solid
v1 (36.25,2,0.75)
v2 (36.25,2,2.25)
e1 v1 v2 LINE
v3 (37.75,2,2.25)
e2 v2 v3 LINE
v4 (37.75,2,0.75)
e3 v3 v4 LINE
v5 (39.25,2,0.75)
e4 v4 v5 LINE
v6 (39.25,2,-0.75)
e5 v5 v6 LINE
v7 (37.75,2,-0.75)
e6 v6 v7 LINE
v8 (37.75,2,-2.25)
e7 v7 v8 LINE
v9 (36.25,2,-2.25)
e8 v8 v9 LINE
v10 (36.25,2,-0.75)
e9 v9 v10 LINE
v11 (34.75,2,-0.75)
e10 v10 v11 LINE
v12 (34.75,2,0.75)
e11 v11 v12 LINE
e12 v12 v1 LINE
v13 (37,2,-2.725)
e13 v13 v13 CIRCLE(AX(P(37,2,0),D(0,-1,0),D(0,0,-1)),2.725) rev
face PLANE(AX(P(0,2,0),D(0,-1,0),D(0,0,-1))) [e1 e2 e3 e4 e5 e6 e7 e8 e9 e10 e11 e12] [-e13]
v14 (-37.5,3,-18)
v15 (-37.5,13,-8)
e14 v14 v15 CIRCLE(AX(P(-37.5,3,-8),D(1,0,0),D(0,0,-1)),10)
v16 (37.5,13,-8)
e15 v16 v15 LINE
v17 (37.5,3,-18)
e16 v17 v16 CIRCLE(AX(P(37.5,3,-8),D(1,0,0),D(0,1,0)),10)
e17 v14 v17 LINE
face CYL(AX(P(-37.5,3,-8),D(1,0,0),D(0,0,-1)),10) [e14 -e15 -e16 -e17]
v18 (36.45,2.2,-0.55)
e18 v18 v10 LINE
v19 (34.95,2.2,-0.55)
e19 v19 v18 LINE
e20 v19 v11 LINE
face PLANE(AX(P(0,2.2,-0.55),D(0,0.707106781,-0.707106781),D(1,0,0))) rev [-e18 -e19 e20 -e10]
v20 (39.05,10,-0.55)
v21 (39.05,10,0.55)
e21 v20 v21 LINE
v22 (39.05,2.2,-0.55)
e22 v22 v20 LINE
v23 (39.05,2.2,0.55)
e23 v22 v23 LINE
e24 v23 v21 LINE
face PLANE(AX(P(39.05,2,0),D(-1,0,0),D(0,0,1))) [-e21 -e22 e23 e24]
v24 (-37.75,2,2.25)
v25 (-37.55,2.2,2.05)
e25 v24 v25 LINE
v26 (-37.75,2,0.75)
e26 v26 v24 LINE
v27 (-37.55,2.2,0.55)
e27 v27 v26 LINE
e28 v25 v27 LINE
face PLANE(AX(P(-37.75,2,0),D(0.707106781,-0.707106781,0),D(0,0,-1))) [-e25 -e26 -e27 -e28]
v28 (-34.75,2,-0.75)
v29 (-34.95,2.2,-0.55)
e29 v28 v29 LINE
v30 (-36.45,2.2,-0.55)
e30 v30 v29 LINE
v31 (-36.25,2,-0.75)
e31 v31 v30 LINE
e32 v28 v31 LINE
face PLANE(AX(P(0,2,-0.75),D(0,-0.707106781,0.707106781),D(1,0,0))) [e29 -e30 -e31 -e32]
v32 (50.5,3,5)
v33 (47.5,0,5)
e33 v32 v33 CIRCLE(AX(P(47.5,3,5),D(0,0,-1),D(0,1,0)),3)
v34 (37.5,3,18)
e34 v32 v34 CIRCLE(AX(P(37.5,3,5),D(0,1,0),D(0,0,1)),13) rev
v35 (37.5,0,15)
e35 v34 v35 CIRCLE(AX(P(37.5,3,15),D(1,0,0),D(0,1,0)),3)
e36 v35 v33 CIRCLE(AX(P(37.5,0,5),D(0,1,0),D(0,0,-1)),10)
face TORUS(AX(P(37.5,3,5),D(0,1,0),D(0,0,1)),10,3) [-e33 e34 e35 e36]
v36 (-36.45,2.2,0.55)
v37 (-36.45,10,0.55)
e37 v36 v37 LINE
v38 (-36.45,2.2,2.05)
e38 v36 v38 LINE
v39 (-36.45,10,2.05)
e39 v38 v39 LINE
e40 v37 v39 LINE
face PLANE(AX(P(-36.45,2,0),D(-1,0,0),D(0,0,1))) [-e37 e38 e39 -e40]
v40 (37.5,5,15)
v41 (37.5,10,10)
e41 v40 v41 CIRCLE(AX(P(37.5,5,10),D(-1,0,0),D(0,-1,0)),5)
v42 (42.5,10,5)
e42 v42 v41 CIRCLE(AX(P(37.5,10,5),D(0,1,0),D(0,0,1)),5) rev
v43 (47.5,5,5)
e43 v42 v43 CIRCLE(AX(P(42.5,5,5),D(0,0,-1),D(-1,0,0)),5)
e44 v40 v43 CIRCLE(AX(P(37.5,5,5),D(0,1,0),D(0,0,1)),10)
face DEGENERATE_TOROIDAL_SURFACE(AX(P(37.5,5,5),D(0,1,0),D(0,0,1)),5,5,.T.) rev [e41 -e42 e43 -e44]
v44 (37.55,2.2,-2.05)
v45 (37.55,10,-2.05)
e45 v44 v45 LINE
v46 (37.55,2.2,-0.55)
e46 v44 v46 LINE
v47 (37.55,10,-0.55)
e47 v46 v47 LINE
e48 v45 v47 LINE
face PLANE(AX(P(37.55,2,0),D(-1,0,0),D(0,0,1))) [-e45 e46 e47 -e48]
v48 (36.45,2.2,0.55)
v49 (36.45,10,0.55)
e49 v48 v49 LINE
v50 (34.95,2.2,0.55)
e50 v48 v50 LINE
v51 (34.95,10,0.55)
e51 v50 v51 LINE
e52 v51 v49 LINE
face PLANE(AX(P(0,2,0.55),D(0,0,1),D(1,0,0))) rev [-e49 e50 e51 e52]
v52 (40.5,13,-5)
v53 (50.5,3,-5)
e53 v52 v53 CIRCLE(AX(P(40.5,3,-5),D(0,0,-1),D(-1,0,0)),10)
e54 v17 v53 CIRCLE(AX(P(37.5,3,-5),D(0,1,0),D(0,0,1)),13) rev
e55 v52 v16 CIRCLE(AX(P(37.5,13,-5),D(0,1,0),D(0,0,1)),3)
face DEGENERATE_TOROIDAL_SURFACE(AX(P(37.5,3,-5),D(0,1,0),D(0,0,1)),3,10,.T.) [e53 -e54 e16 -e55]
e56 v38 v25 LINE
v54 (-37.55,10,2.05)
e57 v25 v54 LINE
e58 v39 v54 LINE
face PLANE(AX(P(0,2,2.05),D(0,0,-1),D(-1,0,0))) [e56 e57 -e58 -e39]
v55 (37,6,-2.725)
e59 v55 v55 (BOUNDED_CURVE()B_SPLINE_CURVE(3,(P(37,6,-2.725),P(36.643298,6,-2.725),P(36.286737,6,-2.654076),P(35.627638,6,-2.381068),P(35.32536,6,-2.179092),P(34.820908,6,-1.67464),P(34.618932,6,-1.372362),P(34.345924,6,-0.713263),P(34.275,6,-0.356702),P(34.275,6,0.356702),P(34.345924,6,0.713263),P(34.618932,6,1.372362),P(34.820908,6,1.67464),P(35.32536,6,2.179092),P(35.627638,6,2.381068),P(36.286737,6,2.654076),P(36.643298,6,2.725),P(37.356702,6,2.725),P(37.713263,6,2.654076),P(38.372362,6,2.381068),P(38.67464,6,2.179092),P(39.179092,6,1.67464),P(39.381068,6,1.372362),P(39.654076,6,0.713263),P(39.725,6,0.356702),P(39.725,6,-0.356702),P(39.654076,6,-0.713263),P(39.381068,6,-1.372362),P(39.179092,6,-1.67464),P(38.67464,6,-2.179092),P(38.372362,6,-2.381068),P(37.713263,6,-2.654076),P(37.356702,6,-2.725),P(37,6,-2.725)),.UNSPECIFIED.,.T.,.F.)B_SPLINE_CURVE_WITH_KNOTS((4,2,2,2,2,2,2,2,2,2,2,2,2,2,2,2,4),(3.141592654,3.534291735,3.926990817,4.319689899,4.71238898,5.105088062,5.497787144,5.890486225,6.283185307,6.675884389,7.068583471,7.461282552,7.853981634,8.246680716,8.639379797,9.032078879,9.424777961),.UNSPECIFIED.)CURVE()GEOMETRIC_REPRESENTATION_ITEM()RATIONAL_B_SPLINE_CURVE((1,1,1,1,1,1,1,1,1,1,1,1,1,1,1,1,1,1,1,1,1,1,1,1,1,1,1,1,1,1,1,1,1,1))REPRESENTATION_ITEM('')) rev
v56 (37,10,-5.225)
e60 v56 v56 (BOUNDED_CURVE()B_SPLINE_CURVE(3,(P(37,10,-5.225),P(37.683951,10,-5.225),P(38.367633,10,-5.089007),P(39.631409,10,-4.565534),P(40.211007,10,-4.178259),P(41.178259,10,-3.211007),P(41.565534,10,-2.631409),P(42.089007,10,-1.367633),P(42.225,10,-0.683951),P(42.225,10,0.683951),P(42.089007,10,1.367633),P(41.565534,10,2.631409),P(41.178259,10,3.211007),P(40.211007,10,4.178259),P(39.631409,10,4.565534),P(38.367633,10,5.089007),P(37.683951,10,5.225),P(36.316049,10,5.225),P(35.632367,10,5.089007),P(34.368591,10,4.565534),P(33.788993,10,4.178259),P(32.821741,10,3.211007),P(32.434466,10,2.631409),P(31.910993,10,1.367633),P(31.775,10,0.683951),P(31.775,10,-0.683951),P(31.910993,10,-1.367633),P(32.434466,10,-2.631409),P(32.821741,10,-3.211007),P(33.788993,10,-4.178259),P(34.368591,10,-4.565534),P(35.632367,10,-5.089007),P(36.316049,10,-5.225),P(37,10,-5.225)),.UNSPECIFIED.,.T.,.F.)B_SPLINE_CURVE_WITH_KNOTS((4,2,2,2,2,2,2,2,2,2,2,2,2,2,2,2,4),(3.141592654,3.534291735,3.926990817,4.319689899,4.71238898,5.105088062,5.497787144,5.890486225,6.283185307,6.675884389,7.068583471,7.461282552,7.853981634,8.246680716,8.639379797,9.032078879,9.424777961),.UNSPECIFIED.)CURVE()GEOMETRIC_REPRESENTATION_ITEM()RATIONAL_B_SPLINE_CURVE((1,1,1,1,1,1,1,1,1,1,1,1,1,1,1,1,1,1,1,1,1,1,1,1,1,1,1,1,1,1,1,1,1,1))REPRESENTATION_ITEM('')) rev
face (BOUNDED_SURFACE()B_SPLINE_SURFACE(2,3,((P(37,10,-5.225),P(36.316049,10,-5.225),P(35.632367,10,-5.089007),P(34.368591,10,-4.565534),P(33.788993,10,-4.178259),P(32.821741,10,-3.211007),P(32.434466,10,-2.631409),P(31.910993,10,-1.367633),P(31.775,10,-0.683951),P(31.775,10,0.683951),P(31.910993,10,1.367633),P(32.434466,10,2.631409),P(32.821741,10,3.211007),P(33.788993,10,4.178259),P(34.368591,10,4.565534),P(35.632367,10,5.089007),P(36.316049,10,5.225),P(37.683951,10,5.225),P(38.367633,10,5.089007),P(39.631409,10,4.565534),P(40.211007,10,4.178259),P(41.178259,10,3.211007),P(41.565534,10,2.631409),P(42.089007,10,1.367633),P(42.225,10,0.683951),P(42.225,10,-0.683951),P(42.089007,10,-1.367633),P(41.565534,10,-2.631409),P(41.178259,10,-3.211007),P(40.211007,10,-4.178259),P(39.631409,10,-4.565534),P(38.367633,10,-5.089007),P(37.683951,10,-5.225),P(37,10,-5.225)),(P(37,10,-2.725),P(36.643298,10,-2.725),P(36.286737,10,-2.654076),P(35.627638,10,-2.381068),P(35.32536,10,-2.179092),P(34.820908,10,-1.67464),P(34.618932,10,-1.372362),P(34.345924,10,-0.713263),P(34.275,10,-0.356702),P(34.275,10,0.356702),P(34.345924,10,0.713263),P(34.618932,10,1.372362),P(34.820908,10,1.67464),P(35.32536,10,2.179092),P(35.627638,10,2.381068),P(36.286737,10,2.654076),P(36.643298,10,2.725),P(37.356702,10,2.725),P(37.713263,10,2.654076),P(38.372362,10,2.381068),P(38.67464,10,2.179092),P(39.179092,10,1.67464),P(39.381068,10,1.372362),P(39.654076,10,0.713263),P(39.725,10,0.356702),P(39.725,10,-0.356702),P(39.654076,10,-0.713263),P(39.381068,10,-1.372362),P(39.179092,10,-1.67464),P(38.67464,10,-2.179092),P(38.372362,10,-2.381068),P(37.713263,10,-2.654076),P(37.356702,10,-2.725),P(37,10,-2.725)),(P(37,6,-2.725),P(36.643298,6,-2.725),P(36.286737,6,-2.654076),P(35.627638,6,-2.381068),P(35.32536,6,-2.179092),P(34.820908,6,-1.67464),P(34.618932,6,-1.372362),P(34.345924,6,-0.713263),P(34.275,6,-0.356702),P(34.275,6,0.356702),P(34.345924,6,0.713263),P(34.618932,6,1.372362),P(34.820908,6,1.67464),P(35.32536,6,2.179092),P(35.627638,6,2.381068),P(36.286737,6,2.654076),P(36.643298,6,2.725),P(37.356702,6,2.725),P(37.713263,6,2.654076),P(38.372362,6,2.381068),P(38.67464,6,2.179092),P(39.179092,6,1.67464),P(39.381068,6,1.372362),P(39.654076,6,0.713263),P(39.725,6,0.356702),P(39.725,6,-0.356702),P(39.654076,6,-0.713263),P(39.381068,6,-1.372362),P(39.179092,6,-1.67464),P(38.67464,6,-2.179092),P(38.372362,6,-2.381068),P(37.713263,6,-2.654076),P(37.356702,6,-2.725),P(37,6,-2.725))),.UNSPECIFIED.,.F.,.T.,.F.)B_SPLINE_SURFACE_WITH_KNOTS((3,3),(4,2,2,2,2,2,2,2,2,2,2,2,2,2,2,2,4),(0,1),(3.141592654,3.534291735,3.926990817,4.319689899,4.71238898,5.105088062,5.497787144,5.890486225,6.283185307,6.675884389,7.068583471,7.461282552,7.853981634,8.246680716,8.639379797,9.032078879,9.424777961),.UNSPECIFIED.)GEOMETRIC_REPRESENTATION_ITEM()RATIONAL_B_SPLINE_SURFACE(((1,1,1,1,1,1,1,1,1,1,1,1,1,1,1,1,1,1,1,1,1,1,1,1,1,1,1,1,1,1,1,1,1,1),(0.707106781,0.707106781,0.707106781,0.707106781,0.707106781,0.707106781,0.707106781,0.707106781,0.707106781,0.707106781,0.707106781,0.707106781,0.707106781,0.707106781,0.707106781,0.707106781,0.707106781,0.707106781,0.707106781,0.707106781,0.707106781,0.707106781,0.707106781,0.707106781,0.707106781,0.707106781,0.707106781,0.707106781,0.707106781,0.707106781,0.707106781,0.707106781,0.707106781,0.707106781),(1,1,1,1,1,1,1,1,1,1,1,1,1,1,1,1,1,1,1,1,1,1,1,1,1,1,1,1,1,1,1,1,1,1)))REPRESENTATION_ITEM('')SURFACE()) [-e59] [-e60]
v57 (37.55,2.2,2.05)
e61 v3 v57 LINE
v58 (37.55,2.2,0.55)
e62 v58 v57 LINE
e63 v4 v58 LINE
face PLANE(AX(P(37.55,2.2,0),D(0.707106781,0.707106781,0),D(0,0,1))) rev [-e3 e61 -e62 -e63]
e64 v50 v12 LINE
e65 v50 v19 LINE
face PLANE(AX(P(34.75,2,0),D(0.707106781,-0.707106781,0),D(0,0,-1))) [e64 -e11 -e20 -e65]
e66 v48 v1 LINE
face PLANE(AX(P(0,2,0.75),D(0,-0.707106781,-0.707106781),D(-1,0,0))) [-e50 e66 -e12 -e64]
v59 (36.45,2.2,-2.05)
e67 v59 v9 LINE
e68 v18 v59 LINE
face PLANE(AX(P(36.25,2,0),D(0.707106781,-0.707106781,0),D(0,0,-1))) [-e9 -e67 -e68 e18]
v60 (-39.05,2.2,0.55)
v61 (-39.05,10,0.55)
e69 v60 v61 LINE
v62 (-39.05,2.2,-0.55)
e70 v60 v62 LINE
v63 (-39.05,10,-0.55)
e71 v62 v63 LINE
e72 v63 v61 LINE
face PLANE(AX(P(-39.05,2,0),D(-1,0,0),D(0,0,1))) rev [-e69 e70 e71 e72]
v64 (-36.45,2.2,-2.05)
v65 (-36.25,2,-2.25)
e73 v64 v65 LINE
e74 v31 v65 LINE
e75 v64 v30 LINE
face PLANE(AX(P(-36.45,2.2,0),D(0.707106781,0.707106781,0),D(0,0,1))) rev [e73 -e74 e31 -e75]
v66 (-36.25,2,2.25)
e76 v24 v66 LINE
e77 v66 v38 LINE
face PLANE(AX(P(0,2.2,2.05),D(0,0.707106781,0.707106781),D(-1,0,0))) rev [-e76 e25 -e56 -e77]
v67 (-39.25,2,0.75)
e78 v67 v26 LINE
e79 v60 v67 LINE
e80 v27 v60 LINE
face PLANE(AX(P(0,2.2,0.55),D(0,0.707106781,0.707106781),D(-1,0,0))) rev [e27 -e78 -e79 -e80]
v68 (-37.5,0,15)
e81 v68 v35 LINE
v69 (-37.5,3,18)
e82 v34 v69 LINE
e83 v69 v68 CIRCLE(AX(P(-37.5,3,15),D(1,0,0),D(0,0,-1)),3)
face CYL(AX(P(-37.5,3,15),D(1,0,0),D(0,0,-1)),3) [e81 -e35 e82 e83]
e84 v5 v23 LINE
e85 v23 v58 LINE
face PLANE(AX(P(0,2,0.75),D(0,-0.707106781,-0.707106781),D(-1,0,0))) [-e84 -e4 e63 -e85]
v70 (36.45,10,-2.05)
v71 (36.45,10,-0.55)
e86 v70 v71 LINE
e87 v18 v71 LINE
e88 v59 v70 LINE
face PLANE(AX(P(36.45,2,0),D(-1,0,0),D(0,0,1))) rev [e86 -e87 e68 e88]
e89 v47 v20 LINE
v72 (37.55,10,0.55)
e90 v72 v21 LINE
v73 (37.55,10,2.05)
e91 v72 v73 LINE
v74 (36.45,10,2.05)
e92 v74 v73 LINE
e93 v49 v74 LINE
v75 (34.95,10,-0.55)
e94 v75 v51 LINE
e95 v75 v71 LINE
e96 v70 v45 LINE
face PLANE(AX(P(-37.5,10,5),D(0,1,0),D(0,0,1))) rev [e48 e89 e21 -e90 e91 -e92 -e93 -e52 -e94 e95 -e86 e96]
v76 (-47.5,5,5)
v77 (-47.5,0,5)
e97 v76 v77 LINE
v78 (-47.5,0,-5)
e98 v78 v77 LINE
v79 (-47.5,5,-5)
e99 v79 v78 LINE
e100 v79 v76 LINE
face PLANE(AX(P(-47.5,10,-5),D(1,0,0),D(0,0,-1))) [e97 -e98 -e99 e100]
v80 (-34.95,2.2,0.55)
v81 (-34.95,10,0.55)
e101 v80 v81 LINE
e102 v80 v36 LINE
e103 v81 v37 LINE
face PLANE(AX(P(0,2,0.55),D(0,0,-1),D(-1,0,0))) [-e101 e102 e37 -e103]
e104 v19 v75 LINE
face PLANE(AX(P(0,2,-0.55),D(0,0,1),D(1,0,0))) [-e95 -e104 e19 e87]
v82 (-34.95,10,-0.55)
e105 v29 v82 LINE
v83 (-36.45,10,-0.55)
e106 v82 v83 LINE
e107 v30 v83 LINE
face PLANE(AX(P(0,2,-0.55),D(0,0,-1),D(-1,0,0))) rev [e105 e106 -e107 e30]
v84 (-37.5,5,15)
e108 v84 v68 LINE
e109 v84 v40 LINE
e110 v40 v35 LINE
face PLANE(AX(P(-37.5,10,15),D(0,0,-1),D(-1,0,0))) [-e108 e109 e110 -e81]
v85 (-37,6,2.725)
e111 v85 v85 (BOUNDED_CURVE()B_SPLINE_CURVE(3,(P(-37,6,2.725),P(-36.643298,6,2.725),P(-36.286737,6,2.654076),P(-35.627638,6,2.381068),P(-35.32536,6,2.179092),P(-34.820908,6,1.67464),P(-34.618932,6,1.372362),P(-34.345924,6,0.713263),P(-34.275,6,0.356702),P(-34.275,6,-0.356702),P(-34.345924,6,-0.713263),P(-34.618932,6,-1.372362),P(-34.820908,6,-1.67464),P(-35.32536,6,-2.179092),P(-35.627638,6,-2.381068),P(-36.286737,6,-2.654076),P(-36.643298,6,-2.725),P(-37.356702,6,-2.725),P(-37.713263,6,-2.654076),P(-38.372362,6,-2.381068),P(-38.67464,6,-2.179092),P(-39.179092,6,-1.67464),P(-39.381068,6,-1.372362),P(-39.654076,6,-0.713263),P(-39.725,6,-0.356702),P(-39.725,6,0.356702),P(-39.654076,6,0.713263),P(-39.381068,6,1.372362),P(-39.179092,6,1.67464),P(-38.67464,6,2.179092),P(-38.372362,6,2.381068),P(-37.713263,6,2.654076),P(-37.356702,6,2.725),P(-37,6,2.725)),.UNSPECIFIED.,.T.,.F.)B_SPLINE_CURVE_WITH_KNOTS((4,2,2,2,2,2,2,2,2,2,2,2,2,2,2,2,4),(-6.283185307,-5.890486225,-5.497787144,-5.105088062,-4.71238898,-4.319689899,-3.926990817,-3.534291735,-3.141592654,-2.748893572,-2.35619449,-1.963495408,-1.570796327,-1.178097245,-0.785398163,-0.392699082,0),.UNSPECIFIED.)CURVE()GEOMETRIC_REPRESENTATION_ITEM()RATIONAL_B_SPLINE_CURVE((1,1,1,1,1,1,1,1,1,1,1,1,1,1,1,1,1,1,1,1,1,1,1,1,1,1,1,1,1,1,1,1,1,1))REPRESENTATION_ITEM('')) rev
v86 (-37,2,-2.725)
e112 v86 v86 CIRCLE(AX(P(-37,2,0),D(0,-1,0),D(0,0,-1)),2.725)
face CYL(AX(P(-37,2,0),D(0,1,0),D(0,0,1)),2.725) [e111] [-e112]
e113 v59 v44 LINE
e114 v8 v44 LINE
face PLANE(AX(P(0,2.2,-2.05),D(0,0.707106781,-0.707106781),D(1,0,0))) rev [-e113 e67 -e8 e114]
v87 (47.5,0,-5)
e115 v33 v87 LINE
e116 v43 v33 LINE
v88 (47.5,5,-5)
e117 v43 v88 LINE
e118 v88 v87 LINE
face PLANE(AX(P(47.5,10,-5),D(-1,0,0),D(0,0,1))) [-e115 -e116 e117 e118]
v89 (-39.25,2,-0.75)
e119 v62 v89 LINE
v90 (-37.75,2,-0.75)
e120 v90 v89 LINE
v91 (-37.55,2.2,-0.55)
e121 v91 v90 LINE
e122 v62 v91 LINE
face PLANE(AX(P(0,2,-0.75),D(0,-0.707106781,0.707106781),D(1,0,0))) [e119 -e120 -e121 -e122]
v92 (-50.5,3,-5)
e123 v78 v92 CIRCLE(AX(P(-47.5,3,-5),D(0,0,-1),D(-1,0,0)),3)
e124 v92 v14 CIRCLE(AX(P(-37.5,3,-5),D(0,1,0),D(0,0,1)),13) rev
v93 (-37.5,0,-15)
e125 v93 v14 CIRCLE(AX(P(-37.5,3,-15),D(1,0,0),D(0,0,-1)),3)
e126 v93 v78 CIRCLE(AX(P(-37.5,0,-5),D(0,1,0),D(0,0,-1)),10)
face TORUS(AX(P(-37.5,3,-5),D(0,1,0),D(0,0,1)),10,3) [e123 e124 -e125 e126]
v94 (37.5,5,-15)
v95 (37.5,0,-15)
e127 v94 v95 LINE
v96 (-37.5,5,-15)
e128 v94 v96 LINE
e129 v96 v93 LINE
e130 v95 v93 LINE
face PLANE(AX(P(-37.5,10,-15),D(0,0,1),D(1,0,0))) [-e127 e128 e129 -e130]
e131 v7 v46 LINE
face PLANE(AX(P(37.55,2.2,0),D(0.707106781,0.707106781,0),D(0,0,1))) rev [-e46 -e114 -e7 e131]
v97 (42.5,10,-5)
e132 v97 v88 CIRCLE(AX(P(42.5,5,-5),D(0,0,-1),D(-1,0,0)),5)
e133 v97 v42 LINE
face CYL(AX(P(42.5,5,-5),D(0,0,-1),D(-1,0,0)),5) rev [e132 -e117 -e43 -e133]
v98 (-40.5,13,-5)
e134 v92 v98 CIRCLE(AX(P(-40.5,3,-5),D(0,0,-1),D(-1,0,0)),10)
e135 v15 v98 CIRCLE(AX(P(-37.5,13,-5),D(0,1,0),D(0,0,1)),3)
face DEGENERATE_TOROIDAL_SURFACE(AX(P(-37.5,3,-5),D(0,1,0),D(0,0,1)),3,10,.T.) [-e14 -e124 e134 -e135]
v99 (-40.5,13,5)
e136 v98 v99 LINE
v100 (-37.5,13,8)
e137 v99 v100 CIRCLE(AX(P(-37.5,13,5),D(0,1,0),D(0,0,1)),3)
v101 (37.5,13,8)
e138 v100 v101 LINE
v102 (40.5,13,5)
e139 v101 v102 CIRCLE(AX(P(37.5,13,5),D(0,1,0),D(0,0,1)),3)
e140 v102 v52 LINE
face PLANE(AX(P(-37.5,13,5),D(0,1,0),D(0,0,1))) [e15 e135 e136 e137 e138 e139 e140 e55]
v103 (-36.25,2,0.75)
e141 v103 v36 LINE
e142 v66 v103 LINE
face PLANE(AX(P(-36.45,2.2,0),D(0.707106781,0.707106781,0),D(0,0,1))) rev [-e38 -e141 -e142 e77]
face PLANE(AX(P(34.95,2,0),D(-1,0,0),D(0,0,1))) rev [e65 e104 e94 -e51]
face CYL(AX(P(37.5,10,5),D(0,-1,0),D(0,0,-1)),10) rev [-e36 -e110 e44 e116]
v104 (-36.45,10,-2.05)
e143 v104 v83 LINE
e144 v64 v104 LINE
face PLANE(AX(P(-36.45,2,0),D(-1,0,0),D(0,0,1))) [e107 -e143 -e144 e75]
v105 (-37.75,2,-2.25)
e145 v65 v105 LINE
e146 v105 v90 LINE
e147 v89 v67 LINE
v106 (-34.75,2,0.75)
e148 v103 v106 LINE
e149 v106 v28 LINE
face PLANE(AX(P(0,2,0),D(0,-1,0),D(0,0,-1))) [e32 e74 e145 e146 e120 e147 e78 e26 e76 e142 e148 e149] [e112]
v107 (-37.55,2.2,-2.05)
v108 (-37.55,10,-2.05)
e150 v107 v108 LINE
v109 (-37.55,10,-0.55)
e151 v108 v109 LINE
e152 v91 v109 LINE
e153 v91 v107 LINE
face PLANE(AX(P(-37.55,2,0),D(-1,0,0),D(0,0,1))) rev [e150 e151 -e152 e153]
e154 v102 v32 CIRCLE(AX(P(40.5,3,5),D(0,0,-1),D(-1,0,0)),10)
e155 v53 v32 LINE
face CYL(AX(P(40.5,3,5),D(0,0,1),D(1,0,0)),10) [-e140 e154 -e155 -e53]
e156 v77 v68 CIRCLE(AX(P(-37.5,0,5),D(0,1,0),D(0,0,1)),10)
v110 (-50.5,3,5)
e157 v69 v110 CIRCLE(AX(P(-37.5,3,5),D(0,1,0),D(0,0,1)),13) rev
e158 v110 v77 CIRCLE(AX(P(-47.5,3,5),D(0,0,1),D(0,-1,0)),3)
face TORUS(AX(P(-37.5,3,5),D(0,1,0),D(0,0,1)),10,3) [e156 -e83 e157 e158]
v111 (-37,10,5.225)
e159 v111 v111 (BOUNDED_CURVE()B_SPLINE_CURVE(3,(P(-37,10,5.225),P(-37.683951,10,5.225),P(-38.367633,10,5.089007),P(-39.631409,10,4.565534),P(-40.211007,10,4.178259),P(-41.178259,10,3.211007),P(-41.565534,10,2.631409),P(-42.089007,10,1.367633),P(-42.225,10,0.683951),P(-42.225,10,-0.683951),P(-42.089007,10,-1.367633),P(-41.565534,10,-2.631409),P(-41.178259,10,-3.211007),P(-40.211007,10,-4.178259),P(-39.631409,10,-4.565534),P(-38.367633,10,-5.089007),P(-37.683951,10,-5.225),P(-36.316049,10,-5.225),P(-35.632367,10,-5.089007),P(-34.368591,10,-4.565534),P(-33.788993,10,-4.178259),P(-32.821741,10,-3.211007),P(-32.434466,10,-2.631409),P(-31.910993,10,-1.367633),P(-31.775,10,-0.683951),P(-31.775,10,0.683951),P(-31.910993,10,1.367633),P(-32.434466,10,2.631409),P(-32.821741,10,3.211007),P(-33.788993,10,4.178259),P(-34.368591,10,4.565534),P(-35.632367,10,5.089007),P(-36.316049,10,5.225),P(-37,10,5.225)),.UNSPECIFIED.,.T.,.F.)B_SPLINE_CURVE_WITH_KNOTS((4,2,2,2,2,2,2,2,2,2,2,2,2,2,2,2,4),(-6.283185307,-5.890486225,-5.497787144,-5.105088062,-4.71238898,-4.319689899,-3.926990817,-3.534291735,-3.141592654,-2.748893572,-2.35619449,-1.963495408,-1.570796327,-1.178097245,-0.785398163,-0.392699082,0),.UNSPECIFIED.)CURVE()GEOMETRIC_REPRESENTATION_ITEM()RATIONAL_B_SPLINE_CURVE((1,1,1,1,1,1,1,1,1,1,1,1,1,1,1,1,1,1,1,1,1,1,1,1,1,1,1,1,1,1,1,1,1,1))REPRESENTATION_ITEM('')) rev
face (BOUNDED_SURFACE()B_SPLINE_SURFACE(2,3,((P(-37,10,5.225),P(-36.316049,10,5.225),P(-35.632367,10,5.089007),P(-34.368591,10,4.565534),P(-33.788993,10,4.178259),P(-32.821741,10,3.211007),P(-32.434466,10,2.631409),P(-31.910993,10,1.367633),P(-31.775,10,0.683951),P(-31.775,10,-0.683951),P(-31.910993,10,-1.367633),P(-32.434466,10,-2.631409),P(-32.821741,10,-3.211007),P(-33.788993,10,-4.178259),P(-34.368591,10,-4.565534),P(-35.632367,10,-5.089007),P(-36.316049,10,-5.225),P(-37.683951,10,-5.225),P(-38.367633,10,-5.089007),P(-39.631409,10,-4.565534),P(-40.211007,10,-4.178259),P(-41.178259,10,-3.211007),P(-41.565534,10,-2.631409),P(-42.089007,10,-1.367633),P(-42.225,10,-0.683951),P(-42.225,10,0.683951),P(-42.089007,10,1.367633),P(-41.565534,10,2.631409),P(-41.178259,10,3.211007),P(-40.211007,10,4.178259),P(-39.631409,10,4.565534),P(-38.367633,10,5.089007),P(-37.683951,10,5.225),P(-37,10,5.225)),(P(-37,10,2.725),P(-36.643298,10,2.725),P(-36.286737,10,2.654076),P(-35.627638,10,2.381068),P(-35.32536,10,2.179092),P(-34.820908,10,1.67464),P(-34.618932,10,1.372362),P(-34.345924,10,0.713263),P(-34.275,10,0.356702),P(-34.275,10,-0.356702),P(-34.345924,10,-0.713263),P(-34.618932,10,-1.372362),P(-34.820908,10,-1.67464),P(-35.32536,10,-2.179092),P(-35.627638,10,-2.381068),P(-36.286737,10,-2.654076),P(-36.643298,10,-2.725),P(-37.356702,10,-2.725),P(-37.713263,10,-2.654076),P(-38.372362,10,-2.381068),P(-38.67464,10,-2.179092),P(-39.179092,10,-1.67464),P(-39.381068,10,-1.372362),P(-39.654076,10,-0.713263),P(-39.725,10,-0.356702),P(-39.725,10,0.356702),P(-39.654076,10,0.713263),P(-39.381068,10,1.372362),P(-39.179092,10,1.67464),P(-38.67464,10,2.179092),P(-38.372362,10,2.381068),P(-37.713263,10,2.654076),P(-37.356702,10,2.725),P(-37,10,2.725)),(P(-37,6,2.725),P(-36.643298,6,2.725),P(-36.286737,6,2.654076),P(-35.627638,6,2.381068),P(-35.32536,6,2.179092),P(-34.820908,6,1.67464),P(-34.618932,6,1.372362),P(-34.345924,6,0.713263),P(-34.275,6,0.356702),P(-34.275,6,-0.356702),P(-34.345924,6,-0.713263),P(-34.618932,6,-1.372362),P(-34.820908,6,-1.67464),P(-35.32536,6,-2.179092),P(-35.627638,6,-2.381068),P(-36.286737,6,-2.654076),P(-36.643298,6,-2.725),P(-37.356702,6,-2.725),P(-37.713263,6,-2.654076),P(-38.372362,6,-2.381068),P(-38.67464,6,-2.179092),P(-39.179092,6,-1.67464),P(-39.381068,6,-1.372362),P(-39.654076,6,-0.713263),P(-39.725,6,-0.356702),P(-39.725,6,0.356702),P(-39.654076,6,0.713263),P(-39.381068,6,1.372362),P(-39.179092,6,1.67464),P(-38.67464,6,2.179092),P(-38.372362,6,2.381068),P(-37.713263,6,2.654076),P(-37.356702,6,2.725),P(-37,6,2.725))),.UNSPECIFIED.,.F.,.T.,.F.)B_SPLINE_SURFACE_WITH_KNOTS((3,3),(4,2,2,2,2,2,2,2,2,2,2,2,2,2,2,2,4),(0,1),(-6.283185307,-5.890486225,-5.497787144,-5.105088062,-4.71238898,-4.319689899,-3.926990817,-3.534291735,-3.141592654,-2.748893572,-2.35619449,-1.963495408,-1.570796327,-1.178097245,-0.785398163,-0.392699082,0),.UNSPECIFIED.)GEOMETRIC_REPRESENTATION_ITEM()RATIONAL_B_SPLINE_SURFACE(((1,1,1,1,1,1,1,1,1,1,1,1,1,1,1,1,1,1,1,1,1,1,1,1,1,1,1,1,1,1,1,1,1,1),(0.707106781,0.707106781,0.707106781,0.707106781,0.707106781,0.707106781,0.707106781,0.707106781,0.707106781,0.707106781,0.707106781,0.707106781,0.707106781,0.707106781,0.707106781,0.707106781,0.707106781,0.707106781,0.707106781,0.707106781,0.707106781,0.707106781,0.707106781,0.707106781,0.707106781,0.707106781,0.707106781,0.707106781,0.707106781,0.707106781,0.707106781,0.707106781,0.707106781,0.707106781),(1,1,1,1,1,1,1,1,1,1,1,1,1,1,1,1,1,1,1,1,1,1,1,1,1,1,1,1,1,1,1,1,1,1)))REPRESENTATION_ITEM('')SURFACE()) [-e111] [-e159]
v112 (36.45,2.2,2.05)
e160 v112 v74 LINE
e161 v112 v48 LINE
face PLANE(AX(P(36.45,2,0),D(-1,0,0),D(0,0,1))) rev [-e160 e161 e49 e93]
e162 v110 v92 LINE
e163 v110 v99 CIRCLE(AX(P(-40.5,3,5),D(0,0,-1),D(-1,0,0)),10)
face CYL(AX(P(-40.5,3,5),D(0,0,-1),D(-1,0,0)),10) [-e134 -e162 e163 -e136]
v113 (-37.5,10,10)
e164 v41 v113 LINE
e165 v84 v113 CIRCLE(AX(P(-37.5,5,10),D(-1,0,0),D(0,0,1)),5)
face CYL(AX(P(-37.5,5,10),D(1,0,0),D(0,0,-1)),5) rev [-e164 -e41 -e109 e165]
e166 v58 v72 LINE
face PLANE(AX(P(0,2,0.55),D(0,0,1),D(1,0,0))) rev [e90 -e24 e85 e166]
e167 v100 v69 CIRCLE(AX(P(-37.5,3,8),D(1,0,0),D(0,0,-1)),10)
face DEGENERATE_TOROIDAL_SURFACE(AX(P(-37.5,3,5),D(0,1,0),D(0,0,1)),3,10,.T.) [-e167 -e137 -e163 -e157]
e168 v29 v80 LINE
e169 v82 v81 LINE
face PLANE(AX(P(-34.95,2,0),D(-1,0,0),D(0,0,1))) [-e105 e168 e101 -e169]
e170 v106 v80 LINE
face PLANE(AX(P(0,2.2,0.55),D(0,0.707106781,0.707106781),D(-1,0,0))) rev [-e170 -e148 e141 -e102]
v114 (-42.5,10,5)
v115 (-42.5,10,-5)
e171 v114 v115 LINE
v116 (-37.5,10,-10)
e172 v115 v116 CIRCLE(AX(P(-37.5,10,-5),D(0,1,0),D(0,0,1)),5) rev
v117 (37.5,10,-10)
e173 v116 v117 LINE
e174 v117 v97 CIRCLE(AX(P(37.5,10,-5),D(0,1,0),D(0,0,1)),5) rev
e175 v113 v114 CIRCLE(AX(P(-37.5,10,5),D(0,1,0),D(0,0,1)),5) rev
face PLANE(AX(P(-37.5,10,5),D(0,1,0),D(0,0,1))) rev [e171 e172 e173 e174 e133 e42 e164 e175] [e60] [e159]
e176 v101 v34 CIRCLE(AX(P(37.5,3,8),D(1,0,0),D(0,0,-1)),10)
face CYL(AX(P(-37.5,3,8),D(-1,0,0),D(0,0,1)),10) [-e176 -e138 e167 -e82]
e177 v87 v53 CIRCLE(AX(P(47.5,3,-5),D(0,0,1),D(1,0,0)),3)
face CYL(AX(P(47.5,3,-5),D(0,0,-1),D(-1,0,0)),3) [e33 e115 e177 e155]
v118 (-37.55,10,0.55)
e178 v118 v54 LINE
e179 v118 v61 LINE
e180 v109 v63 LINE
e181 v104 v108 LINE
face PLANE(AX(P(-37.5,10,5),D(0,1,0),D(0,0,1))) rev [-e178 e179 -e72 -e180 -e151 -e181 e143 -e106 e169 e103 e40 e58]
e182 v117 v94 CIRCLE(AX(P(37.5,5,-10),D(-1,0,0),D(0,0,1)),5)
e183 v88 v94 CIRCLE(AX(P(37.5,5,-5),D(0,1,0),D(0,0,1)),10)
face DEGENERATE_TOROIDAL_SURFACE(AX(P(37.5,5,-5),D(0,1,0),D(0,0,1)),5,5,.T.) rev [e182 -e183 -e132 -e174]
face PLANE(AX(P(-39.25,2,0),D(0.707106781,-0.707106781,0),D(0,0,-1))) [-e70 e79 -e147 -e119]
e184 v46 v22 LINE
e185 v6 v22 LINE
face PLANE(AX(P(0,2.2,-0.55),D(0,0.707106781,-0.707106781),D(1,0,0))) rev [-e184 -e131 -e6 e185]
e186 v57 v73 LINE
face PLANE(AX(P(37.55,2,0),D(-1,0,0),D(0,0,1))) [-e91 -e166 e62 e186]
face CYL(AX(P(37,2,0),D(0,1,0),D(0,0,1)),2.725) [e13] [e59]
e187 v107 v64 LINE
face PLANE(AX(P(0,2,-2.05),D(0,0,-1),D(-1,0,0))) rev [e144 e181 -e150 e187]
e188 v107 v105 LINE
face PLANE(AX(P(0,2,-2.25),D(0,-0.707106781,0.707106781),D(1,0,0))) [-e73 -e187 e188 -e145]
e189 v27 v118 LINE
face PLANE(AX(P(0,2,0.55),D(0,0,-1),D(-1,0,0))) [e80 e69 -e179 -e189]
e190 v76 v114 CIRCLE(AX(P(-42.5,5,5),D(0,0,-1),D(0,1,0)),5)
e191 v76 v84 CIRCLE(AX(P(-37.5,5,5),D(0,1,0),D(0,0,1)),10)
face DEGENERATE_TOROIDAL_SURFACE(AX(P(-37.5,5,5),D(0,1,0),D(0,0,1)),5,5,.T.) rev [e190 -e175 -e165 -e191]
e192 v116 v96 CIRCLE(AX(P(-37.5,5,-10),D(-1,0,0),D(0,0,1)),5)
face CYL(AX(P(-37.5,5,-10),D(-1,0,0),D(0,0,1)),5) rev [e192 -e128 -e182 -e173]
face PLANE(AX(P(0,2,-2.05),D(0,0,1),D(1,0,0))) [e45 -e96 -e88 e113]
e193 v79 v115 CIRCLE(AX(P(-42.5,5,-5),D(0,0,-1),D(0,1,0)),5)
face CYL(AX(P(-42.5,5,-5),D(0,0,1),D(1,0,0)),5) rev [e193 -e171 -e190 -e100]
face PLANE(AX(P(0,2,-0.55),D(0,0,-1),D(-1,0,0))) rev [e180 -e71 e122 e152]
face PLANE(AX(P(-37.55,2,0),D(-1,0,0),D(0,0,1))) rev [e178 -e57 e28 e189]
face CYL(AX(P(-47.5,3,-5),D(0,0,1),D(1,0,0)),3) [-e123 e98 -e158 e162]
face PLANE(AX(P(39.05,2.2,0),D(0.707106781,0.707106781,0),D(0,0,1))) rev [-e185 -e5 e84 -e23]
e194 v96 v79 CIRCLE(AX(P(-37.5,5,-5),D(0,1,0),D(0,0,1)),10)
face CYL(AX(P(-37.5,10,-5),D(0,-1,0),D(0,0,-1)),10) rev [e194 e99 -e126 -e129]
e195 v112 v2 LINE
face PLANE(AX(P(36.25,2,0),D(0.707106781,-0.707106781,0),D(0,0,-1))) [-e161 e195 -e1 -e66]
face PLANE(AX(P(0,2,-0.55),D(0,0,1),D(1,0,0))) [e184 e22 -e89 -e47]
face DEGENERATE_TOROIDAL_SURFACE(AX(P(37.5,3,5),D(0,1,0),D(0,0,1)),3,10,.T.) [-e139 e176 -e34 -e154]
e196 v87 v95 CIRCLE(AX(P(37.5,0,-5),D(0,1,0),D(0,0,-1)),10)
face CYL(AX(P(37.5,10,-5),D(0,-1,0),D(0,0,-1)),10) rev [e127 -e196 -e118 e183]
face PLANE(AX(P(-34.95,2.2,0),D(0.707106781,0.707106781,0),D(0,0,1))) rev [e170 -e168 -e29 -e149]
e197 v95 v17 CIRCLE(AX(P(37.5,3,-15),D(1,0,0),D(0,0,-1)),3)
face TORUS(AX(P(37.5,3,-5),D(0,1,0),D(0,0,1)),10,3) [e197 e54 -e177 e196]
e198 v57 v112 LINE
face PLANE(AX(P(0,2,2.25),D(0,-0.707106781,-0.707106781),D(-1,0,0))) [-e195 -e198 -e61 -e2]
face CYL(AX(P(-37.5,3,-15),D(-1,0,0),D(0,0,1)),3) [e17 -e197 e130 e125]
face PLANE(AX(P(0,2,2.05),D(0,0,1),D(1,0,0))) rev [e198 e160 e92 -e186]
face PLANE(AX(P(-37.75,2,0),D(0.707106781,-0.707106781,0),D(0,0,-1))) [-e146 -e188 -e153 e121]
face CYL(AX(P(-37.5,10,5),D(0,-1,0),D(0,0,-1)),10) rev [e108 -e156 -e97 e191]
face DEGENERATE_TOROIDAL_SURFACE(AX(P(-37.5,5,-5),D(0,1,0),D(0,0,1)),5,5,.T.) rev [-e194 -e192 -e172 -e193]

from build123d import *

# Parameters (mm, degrees)
EXTRUDE_1_DEPTH  = 10
SHELL_2_T        = 3
FILLET_3_R       = 10
FILLET_4_R       = 3
SKETCH_2_R       = 2.725
EXTRUDE_2_DEPTH  = 8
FILLET_7_R       = 5
CHAMFER_1_SIZE   = 0.2
CHAMFER_2_SIZE   = 0.2
FILLET_9_SIZE    = 2.5
FILLET_9_SIZE_2  = 4
FILLET_10_SIZE   = 2.5
FILLET_10_SIZE_2 = 4


# Some blends are built 0.0001 mm under size
with BuildPart() as part:
    # 草图1 → 凸台-拉伸1 (new body)
    with BuildSketch(Plane(origin=(0, 0, 0), x_dir=(1, 0, 0), z_dir=(0, 1, 0))):
        with BuildLine():
            Line((-37.5, 15), (37.5, 15))
            ThreePointArc((37.5, 15), (44.571067812, 12.071067812), (47.5, 5))
            Line((47.5, 5), (47.5, -5))
            ThreePointArc((47.5, -5), (44.571067812, -12.071067812), (37.5, -15))
            Line((37.5, -15), (-37.5, -15))
            ThreePointArc((-37.5, -15), (-44.571067812, -12.071067812), (-47.5, -5))
            Line((-47.5, -5), (-47.5, 5))
            ThreePointArc((-47.5, 5), (-44.571067812, 12.071067812), (-37.5, 15))
        make_face()
    extrude(amount=EXTRUDE_1_DEPTH)

    # 抽壳2
    shell_2_openings = [part.faces().sort_by_distance(p)[0] for p in [
        (0, 0, 0),
    ]]
    offset(amount=SHELL_2_T, openings=shell_2_openings, kind=Kind.INTERSECTION)

    # 圆角3
    # the kernel refuses this fillet: 10 mm, written as the material it takes off along each edge
    with BuildSketch(Plane(origin=(37.5, 13, 5), x_dir=(1, 0, 0), z_dir=(0, 0, -1))) as fillet_3_piece_1:
        with BuildLine():
            CenterArc((13 - FILLET_3_R, FILLET_3_R), FILLET_3_R, 270, 90)
            Line((13 - FILLET_3_R, 0), (13, 0))
            Line((13, 0), (13, FILLET_3_R))
        make_face()
    revolve(axis=Axis((37.5, 13, 5), (0, -1, 0)), revolution_arc=90, mode=Mode.SUBTRACT)
    with BuildSketch(Plane(origin=(50.5, 13, 5), x_dir=(0, -1, 0), z_dir=(0, 0, -1)), Plane(origin=(-50.5, 13, -5), x_dir=(0, -1, 0), z_dir=(0, 0, 1))) as fillet_3_piece_2:
        with BuildLine():
            CenterArc((FILLET_3_R, FILLET_3_R), FILLET_3_R, 180, 90)
            Line((0, FILLET_3_R), (0, 0))
            Line((0, 0), (FILLET_3_R, 0))
        make_face()
    extrude(amount=10, mode=Mode.SUBTRACT)
    with BuildSketch(Plane(origin=(37.5, 13, -5), x_dir=(0, 0, -1), z_dir=(-1, 0, 0))) as fillet_3_piece_3:
        with BuildLine():
            CenterArc((13 - FILLET_3_R, FILLET_3_R), FILLET_3_R, 270, 90)
            Line((13 - FILLET_3_R, 0), (13, 0))
            Line((13, 0), (13, FILLET_3_R))
        make_face()
    revolve(axis=Axis((37.5, 13, -5), (0, -1, 0)), revolution_arc=90, mode=Mode.SUBTRACT)
    with BuildSketch(Plane(origin=(37.5, 13, -18), x_dir=(0, -1, 0), z_dir=(-1, 0, 0)), Plane(origin=(-37.5, 13, 18), x_dir=(0, -1, 0), z_dir=(1, 0, 0))) as fillet_3_piece_4:
        with BuildLine():
            CenterArc((FILLET_3_R, FILLET_3_R), FILLET_3_R, 180, 90)
            Line((0, FILLET_3_R), (0, 0))
            Line((0, 0), (FILLET_3_R, 0))
        make_face()
    extrude(amount=75, mode=Mode.SUBTRACT)
    with BuildSketch(Plane(origin=(-37.5, 13, -5), x_dir=(-1, 0, 0), z_dir=(0, 0, 1))) as fillet_3_piece_5:
        with BuildLine():
            CenterArc((13 - FILLET_3_R, FILLET_3_R), FILLET_3_R, 270, 90)
            Line((13 - FILLET_3_R, 0), (13, 0))
            Line((13, 0), (13, FILLET_3_R))
        make_face()
    revolve(axis=Axis((-37.5, 13, -5), (0, -1, 0)), revolution_arc=90, mode=Mode.SUBTRACT)
    with BuildSketch(Plane(origin=(-37.5, 13, 5), x_dir=(0, 0, 1), z_dir=(1, 0, 0))) as fillet_3_piece_6:
        with BuildLine():
            CenterArc((13 - FILLET_3_R, FILLET_3_R), FILLET_3_R, 270, 90)
            Line((13 - FILLET_3_R, 0), (13, 0))
            Line((13, 0), (13, FILLET_3_R))
        make_face()
    revolve(axis=Axis((-37.5, 13, 5), (0, -1, 0)), revolution_arc=90, mode=Mode.SUBTRACT)

    # 圆角4
    fillet_4_edges = [part.edges().sort_by_distance(p)[0] for p in [
        (50.5, 0, 0),
        (46.692388155, 0, 14.192388155),
        (0, 0, 18),
        (-46.692388155, 0, 14.192388155),
        (-50.5, 0, 0),
        (-46.692388155, 0, -14.192388155),
        (0, 0, -18),
        (46.692388155, 0, -14.192388155),
    ]]
    fillet(fillet_4_edges, radius=FILLET_4_R - 0.0001)  # a hair under: the kernel refuses the full size

    # 草图2 → 凸台-拉伸2 (add)
    # profile 1 of 2: a face of its own
    with BuildSketch(Plane(origin=(0, 10, 0), x_dir=(-1, 0, 0), z_dir=(0, -1, 0))):
        with Locations(Location((37, 0, 0), (0, 0, 270))):
            Circle(SKETCH_2_R)
        Polygon((34.95, -0.55), (34.95, 0.55), (36.45, 0.55), (36.45, 2.05), (37.55, 2.05), (37.55, 0.55), (39.05, 0.55), (39.05, -0.55), (37.55, -0.55), (37.55, -2.05), (36.45, -2.05), (36.45, -0.55), align=None, mode=Mode.SUBTRACT)
    # profile 2 of 2: a face of its own
    with BuildSketch(Plane(origin=(0, 10, 0), x_dir=(-1, 0, 0), z_dir=(0, -1, 0))):
        with Locations(Location((-37, 0, 0), (0, 0, 90))):
            Circle(SKETCH_2_R)
        Polygon((-37.55, 0.55), (-37.55, 2.05), (-36.45, 2.05), (-36.45, 0.55), (-34.95, 0.55), (-34.95, -0.55), (-36.45, -0.55), (-36.45, -2.05), (-37.55, -2.05), (-37.55, -0.55), (-39.05, -0.55), (-39.05, 0.55), align=None, mode=Mode.SUBTRACT)
    extrude(amount=EXTRUDE_2_DEPTH)

    # 圆角7
    fillet_7_edges = [part.edges().sort_by_distance(p)[0] for p in [
        (-44.571067812, 10, 12.071067812),
        (0, 10, 15),
        (44.571067812, 10, 12.071067812),
        (47.5, 10, 0),
        (44.571067812, 10, -12.071067812),
        (0, 10, -15),
        (-44.571067812, 10, -12.071067812),
        (-47.5, 10, 0),
    ]]
    fillet(fillet_7_edges, radius=FILLET_7_R)

    # 倒角1
    chamfer_1_edges = [part.edges().sort_by_distance(p)[0] for p in [
        (35.7, 2, -0.55),
        (37.55, 2, 1.3),
        (39.05, 2, 0),
        (38.3, 2, -0.55),
        (37.55, 2, -1.3),
        (37, 2, -2.05),
        (34.95, 2, 0),
        (35.7, 2, 0.55),
        (36.45, 2, 1.3),
        (37, 2, 2.05),
        (38.3, 2, 0.55),
        (36.45, 2, -1.3),
    ]]
    chamfer(chamfer_1_edges, length=CHAMFER_1_SIZE)

    # 倒角2
    chamfer_2_edges = [part.edges().sort_by_distance(p)[0] for p in [
        (-37, 2, -2.05),
        (-37.55, 2, -1.3),
        (-38.3, 2, -0.55),
        (-39.05, 2, 0),
        (-37.55, 2, 1.3),
        (-35.7, 2, -0.55),
        (-38.3, 2, 0.55),
        (-37, 2, 2.05),
        (-36.45, 2, 1.3),
        (-35.7, 2, 0.55),
        (-34.95, 2, 0),
        (-36.45, 2, -1.3),
    ]]
    chamfer(chamfer_2_edges, length=CHAMFER_2_SIZE)

    # 圆角9
    # an asymmetric fillet: 4, 2.5 mm, written as the material it adds along each edge
    with BuildSketch(Plane(origin=(37, 10, 0), x_dir=(0, 0, -1), z_dir=(-1, 0, 0))) as fillet_9_piece_1:
        with BuildLine():
            Bezier((2.725 + FILLET_9_SIZE, 0), (2.725, 0), (2.725, FILLET_9_SIZE_2), weights=[1, 0.707106781, 1])
            Line((2.725, FILLET_9_SIZE_2), (2.725, 0))
            Line((2.725, 0), (2.725 + FILLET_9_SIZE, 0))
        make_face()
    revolve(axis=Axis((37, 10, 0), (0, -1, 0)))

    # 圆角10
    # an asymmetric fillet: 4, 2.5 mm, written as the material it adds along each edge
    with BuildSketch(Plane(origin=(-37, 10, 0), x_dir=(0, 0, 1), z_dir=(1, 0, 0))) as fillet_10_piece_1:
        with BuildLine():
            Bezier((2.725 + FILLET_10_SIZE, 0), (2.725, 0), (2.725, FILLET_10_SIZE_2), weights=[1, 0.707106781, 1])
            Line((2.725, FILLET_10_SIZE_2), (2.725, 0))
            Line((2.725, 0), (2.725 + FILLET_10_SIZE, 0))
        make_face()
    revolve(axis=Axis((-37, 10, 0), (0, -1, 0)))


solid = part.part
